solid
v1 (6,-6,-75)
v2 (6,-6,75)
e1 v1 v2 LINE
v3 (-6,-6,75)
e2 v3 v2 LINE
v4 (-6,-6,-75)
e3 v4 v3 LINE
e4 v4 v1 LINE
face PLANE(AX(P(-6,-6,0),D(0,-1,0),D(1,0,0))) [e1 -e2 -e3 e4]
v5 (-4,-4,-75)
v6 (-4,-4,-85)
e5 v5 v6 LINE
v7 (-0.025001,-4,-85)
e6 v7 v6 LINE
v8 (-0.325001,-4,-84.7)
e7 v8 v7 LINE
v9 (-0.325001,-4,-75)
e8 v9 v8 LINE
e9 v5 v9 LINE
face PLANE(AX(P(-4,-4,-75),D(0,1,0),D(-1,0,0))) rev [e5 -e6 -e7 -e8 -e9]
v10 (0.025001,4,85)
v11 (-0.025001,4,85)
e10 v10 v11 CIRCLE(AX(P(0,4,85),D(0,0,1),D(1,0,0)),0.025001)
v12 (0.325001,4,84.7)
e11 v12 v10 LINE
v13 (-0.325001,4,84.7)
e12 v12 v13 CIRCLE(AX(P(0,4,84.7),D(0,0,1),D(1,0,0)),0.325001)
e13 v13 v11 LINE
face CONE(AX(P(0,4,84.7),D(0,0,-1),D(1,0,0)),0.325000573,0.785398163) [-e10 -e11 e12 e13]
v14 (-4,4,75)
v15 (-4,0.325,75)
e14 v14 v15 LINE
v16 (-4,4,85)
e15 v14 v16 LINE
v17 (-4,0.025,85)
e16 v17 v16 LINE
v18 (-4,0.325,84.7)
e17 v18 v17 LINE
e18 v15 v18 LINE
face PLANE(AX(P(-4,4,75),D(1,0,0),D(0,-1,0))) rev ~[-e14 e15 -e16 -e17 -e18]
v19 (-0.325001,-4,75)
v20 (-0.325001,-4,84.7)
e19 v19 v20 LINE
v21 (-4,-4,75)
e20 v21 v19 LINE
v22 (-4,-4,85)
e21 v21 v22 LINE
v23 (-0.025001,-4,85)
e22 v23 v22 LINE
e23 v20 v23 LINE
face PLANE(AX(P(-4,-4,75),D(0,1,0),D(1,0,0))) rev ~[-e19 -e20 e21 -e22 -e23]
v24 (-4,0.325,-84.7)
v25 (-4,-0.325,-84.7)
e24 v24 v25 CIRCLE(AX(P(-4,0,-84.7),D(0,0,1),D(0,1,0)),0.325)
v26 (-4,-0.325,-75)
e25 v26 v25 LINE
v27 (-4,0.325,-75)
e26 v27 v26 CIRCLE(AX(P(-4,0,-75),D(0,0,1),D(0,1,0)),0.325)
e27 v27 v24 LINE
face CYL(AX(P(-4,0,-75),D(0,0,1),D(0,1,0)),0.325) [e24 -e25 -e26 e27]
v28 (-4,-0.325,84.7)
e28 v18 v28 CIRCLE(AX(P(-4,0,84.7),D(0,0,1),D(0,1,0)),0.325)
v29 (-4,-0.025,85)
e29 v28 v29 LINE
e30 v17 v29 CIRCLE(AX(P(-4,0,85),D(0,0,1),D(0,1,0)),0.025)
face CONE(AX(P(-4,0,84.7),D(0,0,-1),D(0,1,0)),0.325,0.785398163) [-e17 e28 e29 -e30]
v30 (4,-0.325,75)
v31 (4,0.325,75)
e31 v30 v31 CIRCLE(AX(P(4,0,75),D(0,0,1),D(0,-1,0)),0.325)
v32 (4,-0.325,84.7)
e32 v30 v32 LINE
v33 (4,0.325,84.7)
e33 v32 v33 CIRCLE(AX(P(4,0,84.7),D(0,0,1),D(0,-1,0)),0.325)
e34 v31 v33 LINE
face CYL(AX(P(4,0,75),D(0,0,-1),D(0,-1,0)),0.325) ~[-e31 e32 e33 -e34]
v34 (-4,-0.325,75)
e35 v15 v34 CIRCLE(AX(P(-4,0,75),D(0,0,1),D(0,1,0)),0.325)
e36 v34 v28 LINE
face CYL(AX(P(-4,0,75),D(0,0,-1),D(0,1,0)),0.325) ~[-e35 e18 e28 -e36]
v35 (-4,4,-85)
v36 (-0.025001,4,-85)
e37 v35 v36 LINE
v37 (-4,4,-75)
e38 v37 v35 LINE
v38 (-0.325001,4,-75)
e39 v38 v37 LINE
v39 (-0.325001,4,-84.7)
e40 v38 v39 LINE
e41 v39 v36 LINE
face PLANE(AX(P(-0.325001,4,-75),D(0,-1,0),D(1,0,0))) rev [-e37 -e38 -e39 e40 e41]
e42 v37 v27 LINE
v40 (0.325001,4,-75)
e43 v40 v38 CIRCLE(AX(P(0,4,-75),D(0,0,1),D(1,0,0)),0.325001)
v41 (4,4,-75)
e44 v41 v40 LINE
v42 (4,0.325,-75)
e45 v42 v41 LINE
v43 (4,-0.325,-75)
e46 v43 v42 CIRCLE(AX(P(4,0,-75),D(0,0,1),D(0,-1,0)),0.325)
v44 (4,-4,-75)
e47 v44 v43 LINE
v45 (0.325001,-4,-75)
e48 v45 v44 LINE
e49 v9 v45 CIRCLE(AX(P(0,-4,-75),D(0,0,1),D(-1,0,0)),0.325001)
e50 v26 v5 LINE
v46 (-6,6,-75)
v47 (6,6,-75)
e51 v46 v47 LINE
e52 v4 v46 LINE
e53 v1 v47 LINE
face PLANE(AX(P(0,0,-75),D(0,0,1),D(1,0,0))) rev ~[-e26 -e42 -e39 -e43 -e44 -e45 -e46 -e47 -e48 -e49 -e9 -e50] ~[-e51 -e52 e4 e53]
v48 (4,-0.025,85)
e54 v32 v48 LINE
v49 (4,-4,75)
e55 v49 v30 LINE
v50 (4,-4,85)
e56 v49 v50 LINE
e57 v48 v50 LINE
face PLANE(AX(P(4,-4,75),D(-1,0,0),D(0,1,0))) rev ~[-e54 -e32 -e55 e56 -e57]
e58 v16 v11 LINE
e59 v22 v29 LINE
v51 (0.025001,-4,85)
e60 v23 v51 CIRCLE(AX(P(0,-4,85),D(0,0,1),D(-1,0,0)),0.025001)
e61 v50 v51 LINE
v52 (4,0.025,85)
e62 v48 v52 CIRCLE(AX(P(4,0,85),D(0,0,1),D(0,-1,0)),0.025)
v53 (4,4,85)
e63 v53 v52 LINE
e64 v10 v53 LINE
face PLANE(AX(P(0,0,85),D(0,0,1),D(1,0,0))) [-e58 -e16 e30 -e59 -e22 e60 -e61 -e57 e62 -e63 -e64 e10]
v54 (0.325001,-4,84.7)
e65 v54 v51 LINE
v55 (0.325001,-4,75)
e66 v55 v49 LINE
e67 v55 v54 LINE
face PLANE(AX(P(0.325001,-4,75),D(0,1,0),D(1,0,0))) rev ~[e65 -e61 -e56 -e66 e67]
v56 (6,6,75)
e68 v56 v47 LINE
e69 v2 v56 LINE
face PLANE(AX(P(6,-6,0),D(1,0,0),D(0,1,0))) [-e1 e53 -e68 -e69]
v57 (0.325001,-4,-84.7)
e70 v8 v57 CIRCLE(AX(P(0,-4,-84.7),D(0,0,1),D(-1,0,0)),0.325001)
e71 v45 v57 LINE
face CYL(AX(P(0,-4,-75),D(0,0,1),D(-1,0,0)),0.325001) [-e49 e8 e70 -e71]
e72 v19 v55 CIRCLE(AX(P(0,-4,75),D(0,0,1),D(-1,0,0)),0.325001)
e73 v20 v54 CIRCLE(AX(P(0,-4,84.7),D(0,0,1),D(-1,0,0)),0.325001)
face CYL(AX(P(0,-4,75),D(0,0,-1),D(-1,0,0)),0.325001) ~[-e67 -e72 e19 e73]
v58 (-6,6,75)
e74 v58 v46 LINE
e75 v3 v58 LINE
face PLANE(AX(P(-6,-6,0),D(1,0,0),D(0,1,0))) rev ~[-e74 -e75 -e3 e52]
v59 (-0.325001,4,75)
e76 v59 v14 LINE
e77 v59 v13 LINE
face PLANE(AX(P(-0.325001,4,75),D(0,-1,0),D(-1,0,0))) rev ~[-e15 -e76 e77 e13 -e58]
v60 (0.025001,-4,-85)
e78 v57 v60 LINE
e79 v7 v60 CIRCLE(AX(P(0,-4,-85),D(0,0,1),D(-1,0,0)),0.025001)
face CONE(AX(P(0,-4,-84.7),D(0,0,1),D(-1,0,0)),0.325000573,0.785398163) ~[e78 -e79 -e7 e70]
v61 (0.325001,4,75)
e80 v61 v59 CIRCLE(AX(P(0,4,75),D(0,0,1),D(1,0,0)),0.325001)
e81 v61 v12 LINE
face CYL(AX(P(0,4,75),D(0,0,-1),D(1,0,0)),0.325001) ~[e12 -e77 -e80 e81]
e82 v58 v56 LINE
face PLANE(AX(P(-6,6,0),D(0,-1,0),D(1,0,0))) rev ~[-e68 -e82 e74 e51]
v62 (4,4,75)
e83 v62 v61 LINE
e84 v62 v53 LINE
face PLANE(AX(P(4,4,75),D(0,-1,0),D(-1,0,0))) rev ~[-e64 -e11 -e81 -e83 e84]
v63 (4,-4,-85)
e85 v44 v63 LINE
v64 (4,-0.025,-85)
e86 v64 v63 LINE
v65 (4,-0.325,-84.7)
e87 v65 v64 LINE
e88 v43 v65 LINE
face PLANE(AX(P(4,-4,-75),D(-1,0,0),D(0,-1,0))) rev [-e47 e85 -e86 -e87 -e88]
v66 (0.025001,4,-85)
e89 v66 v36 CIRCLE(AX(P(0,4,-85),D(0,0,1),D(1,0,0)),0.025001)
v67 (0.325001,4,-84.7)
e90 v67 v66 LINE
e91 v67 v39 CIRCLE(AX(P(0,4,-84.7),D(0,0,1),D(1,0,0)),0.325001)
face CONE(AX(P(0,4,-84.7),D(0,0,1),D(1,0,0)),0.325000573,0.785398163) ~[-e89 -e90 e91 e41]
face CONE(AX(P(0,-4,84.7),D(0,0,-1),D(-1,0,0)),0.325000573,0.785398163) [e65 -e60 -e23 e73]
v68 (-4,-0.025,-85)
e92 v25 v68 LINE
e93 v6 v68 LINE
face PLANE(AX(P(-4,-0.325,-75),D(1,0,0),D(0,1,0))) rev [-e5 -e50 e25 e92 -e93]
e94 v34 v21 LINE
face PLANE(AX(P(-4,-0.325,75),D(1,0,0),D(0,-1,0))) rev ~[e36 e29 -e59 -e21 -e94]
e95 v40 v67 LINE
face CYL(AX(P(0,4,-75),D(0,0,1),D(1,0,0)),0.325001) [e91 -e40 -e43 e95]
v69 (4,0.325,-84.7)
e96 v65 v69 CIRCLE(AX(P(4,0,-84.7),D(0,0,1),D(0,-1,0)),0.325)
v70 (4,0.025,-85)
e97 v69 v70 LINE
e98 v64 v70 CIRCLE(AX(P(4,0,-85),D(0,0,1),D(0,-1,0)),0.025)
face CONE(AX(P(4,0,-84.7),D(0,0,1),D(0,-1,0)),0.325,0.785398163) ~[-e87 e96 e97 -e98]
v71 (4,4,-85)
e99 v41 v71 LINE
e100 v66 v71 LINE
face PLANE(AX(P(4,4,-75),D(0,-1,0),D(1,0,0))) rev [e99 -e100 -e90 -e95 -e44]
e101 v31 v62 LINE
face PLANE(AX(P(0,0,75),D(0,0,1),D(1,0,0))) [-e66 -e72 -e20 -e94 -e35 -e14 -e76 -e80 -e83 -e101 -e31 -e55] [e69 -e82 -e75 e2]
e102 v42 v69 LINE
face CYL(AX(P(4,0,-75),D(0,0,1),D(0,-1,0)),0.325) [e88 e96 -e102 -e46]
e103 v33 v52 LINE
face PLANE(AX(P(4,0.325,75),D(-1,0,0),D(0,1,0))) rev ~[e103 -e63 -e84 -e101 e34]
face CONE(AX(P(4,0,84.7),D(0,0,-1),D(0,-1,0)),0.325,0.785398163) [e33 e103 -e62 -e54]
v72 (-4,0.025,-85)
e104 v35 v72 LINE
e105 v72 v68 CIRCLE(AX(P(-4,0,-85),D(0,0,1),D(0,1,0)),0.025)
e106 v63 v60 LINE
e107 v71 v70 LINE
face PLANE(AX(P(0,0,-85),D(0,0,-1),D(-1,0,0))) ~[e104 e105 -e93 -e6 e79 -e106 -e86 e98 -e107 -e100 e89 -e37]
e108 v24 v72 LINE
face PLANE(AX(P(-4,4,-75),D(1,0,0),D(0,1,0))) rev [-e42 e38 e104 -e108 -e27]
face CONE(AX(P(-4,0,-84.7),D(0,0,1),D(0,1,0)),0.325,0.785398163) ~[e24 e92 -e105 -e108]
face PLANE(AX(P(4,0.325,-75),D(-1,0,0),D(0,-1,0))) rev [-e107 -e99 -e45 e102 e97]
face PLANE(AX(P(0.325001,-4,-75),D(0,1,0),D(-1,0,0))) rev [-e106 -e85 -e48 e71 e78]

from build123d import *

# Parameters (mm, degrees)
F0_W     = 12
F0_H     = 12
F1_DEPTH = 75
F3_DEPTH = 10
F4_SIZE  = 0.3


# Not quite as in the source:
# - a pattern or mirror of a feature is missing from the dataset's text; its kind, count and spacing are read off the source's solid


with BuildPart() as f1:
    # F0 (on Top) → F1 (new body, symmetric)
    with BuildSketch(Plane.XY):
        Rectangle(F0_W, F0_H)
    extrude(amount=F1_DEPTH, both=True)

    # F2 (on face) → F3 (join)
    with BuildSketch(Plane.XY.offset(75)):
        Polygon((-0.3250005729, 4), (-4, 4), (-4, 0.325), (-4, -0.325), (-4, -4), (-0.3250005729, -4), (0.3250005729, -4), (4, -4), (4, -0.325), (4, 0.325), (4, 4), (0.3250005729, 4), align=None)
        with BuildLine():
            ThreePointArc((0.3250005729, 4), (0, 4.3250005729), (-0.3250005729, 4))
            Line((-0.3250005729, 4), (0.3250005729, 4))
        make_face()
        with BuildLine():
            Line((-4, -0.325), (-4, 0.325))
            ThreePointArc((-4, 0.325), (-4.325, 0), (-4, -0.325))
        make_face()
        with BuildLine():
            ThreePointArc((4, -0.325), (4.325, 0), (4, 0.325))
            Line((4, 0.325), (4, -0.325))
        make_face()
        with BuildLine():
            Line((0.3250005729, -4), (-0.3250005729, -4))
            ThreePointArc((-0.3250005729, -4), (0, -4.3250005729), (0.3250005729, -4))
        make_face()
    f3 = extrude(amount=F3_DEPTH)

    # F3_copies: F3 across plane
    add(f3.mirror(Plane(origin=(0, 0, 0), x_dir=(-1, 0, 0), z_dir=(0, 0, -1))))

    # F4
    f4_edges = [f1.edges().sort_by_distance(p)[0] for p in [
        (0, -4.325001, 85),
        (4.325, 0, 85),
        (0, 4.325001, 85),
        (-4.325, 0, 85),
        (-4.325, 0, -85),
        (0, -4.325001, -85),
        (4.325, 0, -85),
        (0, 4.325001, -85),
    ]]
    chamfer(f4_edges, length=F4_SIZE)


solid = f1.part
